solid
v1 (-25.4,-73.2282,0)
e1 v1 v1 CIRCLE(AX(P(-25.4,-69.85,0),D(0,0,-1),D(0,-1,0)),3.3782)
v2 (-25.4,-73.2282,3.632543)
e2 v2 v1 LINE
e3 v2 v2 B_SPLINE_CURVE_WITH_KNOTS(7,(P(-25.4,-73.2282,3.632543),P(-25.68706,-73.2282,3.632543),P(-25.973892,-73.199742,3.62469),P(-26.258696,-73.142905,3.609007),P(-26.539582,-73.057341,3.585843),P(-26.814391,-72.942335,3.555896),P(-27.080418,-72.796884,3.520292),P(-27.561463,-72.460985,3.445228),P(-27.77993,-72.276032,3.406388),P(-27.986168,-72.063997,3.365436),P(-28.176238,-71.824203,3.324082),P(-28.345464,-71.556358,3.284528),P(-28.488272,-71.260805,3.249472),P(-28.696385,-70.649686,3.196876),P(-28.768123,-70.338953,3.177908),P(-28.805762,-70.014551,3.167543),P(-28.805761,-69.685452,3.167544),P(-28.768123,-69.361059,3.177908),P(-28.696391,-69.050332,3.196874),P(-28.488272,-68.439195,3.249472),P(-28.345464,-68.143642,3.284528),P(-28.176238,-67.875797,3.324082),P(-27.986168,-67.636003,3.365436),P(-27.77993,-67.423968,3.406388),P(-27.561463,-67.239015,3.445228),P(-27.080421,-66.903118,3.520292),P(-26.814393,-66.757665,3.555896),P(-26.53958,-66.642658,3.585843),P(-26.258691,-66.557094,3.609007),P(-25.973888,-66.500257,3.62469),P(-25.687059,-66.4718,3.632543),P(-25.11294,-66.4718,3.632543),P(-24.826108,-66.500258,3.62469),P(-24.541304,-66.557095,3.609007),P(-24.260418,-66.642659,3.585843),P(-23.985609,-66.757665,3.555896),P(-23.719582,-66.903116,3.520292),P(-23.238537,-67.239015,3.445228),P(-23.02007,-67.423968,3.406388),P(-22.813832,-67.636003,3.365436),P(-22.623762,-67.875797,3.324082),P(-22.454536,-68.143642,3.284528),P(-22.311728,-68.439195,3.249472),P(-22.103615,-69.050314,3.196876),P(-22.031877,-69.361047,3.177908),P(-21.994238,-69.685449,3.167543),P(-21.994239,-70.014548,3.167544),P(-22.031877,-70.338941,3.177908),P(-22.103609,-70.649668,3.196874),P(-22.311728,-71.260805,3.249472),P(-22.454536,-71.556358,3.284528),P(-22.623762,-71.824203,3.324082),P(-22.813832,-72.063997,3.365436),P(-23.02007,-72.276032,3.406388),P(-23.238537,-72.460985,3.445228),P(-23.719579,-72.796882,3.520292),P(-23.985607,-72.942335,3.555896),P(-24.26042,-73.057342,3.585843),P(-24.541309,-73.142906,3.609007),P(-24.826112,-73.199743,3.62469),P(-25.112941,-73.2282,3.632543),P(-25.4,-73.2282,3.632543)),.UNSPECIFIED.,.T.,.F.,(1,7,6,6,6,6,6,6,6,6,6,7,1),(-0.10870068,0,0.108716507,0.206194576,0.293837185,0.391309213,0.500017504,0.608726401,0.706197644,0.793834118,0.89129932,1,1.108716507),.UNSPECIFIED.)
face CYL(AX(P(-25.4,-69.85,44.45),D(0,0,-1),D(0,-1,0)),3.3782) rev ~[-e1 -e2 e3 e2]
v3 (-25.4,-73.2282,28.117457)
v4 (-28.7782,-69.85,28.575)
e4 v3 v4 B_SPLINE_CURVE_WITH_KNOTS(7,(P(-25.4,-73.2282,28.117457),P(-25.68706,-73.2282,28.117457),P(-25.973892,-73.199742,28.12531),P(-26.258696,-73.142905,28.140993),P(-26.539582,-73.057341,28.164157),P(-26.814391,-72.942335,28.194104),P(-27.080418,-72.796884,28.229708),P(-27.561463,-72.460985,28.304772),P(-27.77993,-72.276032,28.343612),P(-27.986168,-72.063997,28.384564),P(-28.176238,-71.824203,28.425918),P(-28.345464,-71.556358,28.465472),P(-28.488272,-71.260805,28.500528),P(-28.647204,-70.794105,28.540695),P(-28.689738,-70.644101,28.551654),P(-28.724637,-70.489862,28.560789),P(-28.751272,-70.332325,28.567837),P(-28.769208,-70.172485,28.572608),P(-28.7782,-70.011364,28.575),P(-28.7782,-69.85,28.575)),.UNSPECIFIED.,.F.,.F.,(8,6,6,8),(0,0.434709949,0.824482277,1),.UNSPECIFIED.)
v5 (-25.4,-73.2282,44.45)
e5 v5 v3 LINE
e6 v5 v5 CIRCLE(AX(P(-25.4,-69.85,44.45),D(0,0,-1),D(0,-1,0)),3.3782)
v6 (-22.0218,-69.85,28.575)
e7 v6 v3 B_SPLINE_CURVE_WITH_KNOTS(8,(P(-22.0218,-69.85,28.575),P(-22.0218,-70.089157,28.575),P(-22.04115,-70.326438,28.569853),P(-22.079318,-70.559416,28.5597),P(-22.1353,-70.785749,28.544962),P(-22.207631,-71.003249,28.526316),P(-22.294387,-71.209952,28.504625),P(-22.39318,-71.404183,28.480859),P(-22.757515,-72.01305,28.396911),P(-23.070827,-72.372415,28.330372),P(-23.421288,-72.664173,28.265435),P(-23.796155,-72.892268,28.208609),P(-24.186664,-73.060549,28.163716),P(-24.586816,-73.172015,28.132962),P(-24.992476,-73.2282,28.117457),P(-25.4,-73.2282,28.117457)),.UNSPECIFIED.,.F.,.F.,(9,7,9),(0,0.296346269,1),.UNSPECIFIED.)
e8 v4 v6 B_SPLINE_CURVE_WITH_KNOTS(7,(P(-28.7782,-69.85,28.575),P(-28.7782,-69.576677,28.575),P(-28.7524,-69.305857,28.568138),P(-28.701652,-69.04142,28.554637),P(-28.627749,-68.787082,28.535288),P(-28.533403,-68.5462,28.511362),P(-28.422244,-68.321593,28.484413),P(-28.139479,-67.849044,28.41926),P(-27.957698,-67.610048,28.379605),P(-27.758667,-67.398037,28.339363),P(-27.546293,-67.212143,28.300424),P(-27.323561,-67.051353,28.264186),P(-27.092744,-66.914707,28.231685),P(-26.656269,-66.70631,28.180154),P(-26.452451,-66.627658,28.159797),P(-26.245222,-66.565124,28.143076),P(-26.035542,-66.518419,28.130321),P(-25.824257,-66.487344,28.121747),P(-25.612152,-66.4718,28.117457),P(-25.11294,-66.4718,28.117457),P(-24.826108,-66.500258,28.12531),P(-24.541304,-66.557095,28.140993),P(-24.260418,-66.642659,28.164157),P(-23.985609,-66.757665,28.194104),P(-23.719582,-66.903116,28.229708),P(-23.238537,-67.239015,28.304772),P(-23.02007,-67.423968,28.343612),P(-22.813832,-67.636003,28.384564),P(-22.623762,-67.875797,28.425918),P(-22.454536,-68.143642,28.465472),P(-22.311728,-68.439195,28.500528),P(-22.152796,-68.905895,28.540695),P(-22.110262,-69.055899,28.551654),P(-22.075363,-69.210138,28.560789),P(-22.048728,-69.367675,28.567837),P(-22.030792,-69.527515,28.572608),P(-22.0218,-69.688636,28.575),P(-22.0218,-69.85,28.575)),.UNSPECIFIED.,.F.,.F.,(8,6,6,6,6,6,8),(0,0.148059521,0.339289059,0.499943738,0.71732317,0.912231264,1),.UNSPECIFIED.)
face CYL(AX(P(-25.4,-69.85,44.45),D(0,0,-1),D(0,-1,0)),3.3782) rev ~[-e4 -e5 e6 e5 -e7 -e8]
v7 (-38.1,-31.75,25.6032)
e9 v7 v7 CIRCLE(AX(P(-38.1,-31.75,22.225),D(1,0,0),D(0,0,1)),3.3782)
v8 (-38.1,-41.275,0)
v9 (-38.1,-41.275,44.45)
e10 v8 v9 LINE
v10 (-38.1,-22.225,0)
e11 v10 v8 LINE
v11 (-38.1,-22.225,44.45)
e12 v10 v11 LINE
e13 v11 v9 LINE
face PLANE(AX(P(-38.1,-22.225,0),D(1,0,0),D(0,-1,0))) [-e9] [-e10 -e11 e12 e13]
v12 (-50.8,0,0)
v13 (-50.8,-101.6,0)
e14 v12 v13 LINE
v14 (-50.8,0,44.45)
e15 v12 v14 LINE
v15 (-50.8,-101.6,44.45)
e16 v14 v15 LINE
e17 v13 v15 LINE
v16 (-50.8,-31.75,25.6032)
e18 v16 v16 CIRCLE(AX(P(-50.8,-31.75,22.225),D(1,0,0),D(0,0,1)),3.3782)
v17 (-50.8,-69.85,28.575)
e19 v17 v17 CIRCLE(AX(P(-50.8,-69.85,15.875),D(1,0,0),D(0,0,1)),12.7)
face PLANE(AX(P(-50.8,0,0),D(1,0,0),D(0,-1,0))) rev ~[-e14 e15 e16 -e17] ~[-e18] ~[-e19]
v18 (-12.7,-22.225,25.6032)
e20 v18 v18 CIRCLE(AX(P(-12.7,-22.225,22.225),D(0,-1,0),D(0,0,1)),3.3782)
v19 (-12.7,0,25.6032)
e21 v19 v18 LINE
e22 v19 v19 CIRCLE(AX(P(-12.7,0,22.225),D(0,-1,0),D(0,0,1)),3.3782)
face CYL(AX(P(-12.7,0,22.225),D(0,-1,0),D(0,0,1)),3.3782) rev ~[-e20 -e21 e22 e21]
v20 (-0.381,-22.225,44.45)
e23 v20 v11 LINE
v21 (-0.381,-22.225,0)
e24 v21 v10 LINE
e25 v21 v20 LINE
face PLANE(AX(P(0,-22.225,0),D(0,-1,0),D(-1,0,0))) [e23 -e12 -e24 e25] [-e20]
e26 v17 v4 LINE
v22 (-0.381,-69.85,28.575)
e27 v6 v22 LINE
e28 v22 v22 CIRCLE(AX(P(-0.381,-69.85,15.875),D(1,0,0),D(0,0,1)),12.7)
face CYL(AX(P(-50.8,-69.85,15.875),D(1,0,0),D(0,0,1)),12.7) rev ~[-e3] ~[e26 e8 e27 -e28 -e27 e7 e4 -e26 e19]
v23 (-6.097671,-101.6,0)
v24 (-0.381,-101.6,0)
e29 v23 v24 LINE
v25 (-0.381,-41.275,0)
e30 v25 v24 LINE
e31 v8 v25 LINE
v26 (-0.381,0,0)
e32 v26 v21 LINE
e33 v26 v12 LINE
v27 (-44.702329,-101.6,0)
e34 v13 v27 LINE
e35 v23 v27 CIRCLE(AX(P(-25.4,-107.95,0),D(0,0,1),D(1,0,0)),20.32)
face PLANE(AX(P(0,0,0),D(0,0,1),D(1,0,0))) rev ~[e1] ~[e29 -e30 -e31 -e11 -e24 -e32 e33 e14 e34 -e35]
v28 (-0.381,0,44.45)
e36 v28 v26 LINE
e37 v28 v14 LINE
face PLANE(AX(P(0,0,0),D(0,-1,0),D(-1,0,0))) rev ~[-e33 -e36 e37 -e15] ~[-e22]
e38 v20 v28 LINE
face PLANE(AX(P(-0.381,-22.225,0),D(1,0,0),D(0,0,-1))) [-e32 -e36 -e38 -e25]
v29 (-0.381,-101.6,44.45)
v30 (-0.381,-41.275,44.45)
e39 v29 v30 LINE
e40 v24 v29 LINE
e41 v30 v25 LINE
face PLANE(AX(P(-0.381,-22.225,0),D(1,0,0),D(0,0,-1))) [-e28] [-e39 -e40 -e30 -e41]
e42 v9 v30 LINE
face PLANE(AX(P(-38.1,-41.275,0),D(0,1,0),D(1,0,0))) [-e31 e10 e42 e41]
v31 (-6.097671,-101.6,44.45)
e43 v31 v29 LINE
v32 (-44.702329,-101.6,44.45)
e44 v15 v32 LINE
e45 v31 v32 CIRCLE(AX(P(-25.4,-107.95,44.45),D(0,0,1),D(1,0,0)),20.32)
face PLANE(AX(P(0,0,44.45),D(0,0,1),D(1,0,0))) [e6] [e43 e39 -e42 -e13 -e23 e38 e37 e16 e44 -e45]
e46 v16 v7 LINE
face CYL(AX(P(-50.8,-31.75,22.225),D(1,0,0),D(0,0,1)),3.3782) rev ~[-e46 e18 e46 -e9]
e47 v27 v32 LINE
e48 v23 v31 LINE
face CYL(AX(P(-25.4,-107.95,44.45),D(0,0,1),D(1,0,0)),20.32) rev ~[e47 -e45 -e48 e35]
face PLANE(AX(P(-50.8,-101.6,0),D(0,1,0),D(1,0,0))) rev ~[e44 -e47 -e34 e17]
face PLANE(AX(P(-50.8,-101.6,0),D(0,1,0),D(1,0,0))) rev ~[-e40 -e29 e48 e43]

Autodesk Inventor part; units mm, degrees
ref_plane "YZ Plane" through (0, 0, 0) normal (1, 0, 0) x (0, 1, 0)
ref_plane "XZ Plane" through (0, 0, 0) normal (0, 1, 0) x (-1, 0, 0)
ref_plane "XY Plane" through (0, 0, 0) normal (0, 0, 1) x (1, 0, 0)
sketch "Sketch1" plane through (0, 0, 0) normal (0, 0, 1) x (1, 0, 0)
  line L0 (0, 0) -> (-50.8, 0)
  line L1 (-50.8, 0) -> (-50.8, -101.6)
  line L2 (-50.8, -101.6) -> (0, -101.6)
  line L3 (0, -22.225) -> (-38.1, -22.225)
  line L4 (-38.1, -22.225) -> (-38.1, -41.275)
  line L5 (-38.1, -41.275) -> (0, -41.275)
  line L6 (0, -101.6) -> (0, -41.275)
  line L7 (0, -22.225) -> (0, 0)
  dimension "d0" = 101.6
  dimension "d1" = 50.8
  dimension "d4" = 22.225
  dimension "d5" = 38.1
  dimension "d6" = 19.05
extrude "Extrusion1" add sketch "Sketch1" along normal blind 44.45
sketch "Sketch2" plane through (0, -22.225, 0) normal (1, 0, 0) x (0, 0, -1)
  line L0 (-44.45, 0) -> (-44.45, 22.225) projected
  line L1 (0, 22.225) -> (0, -79.375) projected
  line L2 (-44.45, 22.225) -> (0, 22.225)
  line L3 (0, 22.225) -> (0, -79.375)
  line L4 (0, -79.375) -> (-44.45, -79.375)
  line L5 (-44.45, -79.375) -> (-44.45, 22.225)
extrude "Extrusion2" cut sketch "Sketch2" against normal blind 0.381
sketch "Sketch3" plane through (-50.8, 0, 44.45) normal (0, 1, 0) x (1, 0, 0)
  line L0 (0, 44.45) -> (0, 0) projected
  line L1 (50.419, 44.45) -> (0, 44.45) projected
  point P0 (50.8, 44.45)
  point P1 (38.1, 22.225)
  dimension "d9" = 38.1
  dimension "d10" = 22.225
hole "Hole1" at (-12.7, 0, 22.225) direction (0, -1, 0) diameter 6.7564 end up to surface clearance for "Flat Head Machine Screw (82)" size "1/4" standard "Ansi Unified Screw Threads"
sketch "Sketch4" plane through (-50.8, -101.6, 0) normal (-1, 0, 0) x (0, 0, 1)
  line L0 (0, 101.6) -> (0, 0) projected
  line L1 (0, 101.6) -> (44.45, 101.6) projected
  point P0 (22.225, 69.85)
  dimension "d18" = 22.225
  dimension "d19" = 31.75
hole "Hole2" at (-50.8, -31.75, 22.225) direction (1, 0, 0) diameter 6.7564 end through all clearance for "Hex Head Bolt" size "1/4" standard "Ansi Unified Screw Threads"
sketch "Sketch5" plane through (-50.8, -101.6, 0) normal (-1, 0, 0) x (0, 0, 1)
  line L0 (0, 101.6) -> (0, 0) projected
  line L1 (0, 101.6) -> (44.45, 101.6) projected
  point P0 (15.875, 31.75)
  dimension "d27" = 15.875
  dimension "d28" = 69.85
hole "Hole3" at (-50.8, -69.85, 15.875) direction (1, 0, 0) diameter 25.4 end through all
sketch "Sketch6" plane through (0, 0, 44.45) normal (0, 0, 1) x (1, 0, 0)
  line L0 (-0.381, 0) -> (-50.8, 0) projected
  line L1 (-50.8, 0) -> (-50.8, -101.6) projected
  point P0 (0, 0)
  point P1 (-25.4, -69.85)
  dimension "d36" = 69.85
  dimension "d37" = 25.4
hole "Hole4" at (-25.4, -69.85, 44.45) direction (0, 0, -1) diameter 6.7564 end through all clearance for "Hex Head Bolt" size "1/4" standard "Ansi Unified Screw Threads"
sketch "Sketch7" plane through (0, 0, 44.45) normal (0, 0, 1) x (1, 0, 0)
  circle A0 centre (-25.4, -107.95) radius 20.32
  line L0 (-0.381, 0) -> (-50.8, 0) projected
  line L1 (-50.8, 0) -> (-50.8, -101.6) projected
  point P0 (0, 0)
  dimension "d45" = 107.95
  dimension "d46" = 25.4
  dimension "d47" = 40.64
extrude "Extrusion3" cut sketch "Sketch7" against normal through all
equation "\"d10\" = 0.5 * width"
equation "\"d18\" = 0.5 * width"
equation "\"width\" = 44.45"
properties part number "RM Over Support For Arm With Delrin Slider"
